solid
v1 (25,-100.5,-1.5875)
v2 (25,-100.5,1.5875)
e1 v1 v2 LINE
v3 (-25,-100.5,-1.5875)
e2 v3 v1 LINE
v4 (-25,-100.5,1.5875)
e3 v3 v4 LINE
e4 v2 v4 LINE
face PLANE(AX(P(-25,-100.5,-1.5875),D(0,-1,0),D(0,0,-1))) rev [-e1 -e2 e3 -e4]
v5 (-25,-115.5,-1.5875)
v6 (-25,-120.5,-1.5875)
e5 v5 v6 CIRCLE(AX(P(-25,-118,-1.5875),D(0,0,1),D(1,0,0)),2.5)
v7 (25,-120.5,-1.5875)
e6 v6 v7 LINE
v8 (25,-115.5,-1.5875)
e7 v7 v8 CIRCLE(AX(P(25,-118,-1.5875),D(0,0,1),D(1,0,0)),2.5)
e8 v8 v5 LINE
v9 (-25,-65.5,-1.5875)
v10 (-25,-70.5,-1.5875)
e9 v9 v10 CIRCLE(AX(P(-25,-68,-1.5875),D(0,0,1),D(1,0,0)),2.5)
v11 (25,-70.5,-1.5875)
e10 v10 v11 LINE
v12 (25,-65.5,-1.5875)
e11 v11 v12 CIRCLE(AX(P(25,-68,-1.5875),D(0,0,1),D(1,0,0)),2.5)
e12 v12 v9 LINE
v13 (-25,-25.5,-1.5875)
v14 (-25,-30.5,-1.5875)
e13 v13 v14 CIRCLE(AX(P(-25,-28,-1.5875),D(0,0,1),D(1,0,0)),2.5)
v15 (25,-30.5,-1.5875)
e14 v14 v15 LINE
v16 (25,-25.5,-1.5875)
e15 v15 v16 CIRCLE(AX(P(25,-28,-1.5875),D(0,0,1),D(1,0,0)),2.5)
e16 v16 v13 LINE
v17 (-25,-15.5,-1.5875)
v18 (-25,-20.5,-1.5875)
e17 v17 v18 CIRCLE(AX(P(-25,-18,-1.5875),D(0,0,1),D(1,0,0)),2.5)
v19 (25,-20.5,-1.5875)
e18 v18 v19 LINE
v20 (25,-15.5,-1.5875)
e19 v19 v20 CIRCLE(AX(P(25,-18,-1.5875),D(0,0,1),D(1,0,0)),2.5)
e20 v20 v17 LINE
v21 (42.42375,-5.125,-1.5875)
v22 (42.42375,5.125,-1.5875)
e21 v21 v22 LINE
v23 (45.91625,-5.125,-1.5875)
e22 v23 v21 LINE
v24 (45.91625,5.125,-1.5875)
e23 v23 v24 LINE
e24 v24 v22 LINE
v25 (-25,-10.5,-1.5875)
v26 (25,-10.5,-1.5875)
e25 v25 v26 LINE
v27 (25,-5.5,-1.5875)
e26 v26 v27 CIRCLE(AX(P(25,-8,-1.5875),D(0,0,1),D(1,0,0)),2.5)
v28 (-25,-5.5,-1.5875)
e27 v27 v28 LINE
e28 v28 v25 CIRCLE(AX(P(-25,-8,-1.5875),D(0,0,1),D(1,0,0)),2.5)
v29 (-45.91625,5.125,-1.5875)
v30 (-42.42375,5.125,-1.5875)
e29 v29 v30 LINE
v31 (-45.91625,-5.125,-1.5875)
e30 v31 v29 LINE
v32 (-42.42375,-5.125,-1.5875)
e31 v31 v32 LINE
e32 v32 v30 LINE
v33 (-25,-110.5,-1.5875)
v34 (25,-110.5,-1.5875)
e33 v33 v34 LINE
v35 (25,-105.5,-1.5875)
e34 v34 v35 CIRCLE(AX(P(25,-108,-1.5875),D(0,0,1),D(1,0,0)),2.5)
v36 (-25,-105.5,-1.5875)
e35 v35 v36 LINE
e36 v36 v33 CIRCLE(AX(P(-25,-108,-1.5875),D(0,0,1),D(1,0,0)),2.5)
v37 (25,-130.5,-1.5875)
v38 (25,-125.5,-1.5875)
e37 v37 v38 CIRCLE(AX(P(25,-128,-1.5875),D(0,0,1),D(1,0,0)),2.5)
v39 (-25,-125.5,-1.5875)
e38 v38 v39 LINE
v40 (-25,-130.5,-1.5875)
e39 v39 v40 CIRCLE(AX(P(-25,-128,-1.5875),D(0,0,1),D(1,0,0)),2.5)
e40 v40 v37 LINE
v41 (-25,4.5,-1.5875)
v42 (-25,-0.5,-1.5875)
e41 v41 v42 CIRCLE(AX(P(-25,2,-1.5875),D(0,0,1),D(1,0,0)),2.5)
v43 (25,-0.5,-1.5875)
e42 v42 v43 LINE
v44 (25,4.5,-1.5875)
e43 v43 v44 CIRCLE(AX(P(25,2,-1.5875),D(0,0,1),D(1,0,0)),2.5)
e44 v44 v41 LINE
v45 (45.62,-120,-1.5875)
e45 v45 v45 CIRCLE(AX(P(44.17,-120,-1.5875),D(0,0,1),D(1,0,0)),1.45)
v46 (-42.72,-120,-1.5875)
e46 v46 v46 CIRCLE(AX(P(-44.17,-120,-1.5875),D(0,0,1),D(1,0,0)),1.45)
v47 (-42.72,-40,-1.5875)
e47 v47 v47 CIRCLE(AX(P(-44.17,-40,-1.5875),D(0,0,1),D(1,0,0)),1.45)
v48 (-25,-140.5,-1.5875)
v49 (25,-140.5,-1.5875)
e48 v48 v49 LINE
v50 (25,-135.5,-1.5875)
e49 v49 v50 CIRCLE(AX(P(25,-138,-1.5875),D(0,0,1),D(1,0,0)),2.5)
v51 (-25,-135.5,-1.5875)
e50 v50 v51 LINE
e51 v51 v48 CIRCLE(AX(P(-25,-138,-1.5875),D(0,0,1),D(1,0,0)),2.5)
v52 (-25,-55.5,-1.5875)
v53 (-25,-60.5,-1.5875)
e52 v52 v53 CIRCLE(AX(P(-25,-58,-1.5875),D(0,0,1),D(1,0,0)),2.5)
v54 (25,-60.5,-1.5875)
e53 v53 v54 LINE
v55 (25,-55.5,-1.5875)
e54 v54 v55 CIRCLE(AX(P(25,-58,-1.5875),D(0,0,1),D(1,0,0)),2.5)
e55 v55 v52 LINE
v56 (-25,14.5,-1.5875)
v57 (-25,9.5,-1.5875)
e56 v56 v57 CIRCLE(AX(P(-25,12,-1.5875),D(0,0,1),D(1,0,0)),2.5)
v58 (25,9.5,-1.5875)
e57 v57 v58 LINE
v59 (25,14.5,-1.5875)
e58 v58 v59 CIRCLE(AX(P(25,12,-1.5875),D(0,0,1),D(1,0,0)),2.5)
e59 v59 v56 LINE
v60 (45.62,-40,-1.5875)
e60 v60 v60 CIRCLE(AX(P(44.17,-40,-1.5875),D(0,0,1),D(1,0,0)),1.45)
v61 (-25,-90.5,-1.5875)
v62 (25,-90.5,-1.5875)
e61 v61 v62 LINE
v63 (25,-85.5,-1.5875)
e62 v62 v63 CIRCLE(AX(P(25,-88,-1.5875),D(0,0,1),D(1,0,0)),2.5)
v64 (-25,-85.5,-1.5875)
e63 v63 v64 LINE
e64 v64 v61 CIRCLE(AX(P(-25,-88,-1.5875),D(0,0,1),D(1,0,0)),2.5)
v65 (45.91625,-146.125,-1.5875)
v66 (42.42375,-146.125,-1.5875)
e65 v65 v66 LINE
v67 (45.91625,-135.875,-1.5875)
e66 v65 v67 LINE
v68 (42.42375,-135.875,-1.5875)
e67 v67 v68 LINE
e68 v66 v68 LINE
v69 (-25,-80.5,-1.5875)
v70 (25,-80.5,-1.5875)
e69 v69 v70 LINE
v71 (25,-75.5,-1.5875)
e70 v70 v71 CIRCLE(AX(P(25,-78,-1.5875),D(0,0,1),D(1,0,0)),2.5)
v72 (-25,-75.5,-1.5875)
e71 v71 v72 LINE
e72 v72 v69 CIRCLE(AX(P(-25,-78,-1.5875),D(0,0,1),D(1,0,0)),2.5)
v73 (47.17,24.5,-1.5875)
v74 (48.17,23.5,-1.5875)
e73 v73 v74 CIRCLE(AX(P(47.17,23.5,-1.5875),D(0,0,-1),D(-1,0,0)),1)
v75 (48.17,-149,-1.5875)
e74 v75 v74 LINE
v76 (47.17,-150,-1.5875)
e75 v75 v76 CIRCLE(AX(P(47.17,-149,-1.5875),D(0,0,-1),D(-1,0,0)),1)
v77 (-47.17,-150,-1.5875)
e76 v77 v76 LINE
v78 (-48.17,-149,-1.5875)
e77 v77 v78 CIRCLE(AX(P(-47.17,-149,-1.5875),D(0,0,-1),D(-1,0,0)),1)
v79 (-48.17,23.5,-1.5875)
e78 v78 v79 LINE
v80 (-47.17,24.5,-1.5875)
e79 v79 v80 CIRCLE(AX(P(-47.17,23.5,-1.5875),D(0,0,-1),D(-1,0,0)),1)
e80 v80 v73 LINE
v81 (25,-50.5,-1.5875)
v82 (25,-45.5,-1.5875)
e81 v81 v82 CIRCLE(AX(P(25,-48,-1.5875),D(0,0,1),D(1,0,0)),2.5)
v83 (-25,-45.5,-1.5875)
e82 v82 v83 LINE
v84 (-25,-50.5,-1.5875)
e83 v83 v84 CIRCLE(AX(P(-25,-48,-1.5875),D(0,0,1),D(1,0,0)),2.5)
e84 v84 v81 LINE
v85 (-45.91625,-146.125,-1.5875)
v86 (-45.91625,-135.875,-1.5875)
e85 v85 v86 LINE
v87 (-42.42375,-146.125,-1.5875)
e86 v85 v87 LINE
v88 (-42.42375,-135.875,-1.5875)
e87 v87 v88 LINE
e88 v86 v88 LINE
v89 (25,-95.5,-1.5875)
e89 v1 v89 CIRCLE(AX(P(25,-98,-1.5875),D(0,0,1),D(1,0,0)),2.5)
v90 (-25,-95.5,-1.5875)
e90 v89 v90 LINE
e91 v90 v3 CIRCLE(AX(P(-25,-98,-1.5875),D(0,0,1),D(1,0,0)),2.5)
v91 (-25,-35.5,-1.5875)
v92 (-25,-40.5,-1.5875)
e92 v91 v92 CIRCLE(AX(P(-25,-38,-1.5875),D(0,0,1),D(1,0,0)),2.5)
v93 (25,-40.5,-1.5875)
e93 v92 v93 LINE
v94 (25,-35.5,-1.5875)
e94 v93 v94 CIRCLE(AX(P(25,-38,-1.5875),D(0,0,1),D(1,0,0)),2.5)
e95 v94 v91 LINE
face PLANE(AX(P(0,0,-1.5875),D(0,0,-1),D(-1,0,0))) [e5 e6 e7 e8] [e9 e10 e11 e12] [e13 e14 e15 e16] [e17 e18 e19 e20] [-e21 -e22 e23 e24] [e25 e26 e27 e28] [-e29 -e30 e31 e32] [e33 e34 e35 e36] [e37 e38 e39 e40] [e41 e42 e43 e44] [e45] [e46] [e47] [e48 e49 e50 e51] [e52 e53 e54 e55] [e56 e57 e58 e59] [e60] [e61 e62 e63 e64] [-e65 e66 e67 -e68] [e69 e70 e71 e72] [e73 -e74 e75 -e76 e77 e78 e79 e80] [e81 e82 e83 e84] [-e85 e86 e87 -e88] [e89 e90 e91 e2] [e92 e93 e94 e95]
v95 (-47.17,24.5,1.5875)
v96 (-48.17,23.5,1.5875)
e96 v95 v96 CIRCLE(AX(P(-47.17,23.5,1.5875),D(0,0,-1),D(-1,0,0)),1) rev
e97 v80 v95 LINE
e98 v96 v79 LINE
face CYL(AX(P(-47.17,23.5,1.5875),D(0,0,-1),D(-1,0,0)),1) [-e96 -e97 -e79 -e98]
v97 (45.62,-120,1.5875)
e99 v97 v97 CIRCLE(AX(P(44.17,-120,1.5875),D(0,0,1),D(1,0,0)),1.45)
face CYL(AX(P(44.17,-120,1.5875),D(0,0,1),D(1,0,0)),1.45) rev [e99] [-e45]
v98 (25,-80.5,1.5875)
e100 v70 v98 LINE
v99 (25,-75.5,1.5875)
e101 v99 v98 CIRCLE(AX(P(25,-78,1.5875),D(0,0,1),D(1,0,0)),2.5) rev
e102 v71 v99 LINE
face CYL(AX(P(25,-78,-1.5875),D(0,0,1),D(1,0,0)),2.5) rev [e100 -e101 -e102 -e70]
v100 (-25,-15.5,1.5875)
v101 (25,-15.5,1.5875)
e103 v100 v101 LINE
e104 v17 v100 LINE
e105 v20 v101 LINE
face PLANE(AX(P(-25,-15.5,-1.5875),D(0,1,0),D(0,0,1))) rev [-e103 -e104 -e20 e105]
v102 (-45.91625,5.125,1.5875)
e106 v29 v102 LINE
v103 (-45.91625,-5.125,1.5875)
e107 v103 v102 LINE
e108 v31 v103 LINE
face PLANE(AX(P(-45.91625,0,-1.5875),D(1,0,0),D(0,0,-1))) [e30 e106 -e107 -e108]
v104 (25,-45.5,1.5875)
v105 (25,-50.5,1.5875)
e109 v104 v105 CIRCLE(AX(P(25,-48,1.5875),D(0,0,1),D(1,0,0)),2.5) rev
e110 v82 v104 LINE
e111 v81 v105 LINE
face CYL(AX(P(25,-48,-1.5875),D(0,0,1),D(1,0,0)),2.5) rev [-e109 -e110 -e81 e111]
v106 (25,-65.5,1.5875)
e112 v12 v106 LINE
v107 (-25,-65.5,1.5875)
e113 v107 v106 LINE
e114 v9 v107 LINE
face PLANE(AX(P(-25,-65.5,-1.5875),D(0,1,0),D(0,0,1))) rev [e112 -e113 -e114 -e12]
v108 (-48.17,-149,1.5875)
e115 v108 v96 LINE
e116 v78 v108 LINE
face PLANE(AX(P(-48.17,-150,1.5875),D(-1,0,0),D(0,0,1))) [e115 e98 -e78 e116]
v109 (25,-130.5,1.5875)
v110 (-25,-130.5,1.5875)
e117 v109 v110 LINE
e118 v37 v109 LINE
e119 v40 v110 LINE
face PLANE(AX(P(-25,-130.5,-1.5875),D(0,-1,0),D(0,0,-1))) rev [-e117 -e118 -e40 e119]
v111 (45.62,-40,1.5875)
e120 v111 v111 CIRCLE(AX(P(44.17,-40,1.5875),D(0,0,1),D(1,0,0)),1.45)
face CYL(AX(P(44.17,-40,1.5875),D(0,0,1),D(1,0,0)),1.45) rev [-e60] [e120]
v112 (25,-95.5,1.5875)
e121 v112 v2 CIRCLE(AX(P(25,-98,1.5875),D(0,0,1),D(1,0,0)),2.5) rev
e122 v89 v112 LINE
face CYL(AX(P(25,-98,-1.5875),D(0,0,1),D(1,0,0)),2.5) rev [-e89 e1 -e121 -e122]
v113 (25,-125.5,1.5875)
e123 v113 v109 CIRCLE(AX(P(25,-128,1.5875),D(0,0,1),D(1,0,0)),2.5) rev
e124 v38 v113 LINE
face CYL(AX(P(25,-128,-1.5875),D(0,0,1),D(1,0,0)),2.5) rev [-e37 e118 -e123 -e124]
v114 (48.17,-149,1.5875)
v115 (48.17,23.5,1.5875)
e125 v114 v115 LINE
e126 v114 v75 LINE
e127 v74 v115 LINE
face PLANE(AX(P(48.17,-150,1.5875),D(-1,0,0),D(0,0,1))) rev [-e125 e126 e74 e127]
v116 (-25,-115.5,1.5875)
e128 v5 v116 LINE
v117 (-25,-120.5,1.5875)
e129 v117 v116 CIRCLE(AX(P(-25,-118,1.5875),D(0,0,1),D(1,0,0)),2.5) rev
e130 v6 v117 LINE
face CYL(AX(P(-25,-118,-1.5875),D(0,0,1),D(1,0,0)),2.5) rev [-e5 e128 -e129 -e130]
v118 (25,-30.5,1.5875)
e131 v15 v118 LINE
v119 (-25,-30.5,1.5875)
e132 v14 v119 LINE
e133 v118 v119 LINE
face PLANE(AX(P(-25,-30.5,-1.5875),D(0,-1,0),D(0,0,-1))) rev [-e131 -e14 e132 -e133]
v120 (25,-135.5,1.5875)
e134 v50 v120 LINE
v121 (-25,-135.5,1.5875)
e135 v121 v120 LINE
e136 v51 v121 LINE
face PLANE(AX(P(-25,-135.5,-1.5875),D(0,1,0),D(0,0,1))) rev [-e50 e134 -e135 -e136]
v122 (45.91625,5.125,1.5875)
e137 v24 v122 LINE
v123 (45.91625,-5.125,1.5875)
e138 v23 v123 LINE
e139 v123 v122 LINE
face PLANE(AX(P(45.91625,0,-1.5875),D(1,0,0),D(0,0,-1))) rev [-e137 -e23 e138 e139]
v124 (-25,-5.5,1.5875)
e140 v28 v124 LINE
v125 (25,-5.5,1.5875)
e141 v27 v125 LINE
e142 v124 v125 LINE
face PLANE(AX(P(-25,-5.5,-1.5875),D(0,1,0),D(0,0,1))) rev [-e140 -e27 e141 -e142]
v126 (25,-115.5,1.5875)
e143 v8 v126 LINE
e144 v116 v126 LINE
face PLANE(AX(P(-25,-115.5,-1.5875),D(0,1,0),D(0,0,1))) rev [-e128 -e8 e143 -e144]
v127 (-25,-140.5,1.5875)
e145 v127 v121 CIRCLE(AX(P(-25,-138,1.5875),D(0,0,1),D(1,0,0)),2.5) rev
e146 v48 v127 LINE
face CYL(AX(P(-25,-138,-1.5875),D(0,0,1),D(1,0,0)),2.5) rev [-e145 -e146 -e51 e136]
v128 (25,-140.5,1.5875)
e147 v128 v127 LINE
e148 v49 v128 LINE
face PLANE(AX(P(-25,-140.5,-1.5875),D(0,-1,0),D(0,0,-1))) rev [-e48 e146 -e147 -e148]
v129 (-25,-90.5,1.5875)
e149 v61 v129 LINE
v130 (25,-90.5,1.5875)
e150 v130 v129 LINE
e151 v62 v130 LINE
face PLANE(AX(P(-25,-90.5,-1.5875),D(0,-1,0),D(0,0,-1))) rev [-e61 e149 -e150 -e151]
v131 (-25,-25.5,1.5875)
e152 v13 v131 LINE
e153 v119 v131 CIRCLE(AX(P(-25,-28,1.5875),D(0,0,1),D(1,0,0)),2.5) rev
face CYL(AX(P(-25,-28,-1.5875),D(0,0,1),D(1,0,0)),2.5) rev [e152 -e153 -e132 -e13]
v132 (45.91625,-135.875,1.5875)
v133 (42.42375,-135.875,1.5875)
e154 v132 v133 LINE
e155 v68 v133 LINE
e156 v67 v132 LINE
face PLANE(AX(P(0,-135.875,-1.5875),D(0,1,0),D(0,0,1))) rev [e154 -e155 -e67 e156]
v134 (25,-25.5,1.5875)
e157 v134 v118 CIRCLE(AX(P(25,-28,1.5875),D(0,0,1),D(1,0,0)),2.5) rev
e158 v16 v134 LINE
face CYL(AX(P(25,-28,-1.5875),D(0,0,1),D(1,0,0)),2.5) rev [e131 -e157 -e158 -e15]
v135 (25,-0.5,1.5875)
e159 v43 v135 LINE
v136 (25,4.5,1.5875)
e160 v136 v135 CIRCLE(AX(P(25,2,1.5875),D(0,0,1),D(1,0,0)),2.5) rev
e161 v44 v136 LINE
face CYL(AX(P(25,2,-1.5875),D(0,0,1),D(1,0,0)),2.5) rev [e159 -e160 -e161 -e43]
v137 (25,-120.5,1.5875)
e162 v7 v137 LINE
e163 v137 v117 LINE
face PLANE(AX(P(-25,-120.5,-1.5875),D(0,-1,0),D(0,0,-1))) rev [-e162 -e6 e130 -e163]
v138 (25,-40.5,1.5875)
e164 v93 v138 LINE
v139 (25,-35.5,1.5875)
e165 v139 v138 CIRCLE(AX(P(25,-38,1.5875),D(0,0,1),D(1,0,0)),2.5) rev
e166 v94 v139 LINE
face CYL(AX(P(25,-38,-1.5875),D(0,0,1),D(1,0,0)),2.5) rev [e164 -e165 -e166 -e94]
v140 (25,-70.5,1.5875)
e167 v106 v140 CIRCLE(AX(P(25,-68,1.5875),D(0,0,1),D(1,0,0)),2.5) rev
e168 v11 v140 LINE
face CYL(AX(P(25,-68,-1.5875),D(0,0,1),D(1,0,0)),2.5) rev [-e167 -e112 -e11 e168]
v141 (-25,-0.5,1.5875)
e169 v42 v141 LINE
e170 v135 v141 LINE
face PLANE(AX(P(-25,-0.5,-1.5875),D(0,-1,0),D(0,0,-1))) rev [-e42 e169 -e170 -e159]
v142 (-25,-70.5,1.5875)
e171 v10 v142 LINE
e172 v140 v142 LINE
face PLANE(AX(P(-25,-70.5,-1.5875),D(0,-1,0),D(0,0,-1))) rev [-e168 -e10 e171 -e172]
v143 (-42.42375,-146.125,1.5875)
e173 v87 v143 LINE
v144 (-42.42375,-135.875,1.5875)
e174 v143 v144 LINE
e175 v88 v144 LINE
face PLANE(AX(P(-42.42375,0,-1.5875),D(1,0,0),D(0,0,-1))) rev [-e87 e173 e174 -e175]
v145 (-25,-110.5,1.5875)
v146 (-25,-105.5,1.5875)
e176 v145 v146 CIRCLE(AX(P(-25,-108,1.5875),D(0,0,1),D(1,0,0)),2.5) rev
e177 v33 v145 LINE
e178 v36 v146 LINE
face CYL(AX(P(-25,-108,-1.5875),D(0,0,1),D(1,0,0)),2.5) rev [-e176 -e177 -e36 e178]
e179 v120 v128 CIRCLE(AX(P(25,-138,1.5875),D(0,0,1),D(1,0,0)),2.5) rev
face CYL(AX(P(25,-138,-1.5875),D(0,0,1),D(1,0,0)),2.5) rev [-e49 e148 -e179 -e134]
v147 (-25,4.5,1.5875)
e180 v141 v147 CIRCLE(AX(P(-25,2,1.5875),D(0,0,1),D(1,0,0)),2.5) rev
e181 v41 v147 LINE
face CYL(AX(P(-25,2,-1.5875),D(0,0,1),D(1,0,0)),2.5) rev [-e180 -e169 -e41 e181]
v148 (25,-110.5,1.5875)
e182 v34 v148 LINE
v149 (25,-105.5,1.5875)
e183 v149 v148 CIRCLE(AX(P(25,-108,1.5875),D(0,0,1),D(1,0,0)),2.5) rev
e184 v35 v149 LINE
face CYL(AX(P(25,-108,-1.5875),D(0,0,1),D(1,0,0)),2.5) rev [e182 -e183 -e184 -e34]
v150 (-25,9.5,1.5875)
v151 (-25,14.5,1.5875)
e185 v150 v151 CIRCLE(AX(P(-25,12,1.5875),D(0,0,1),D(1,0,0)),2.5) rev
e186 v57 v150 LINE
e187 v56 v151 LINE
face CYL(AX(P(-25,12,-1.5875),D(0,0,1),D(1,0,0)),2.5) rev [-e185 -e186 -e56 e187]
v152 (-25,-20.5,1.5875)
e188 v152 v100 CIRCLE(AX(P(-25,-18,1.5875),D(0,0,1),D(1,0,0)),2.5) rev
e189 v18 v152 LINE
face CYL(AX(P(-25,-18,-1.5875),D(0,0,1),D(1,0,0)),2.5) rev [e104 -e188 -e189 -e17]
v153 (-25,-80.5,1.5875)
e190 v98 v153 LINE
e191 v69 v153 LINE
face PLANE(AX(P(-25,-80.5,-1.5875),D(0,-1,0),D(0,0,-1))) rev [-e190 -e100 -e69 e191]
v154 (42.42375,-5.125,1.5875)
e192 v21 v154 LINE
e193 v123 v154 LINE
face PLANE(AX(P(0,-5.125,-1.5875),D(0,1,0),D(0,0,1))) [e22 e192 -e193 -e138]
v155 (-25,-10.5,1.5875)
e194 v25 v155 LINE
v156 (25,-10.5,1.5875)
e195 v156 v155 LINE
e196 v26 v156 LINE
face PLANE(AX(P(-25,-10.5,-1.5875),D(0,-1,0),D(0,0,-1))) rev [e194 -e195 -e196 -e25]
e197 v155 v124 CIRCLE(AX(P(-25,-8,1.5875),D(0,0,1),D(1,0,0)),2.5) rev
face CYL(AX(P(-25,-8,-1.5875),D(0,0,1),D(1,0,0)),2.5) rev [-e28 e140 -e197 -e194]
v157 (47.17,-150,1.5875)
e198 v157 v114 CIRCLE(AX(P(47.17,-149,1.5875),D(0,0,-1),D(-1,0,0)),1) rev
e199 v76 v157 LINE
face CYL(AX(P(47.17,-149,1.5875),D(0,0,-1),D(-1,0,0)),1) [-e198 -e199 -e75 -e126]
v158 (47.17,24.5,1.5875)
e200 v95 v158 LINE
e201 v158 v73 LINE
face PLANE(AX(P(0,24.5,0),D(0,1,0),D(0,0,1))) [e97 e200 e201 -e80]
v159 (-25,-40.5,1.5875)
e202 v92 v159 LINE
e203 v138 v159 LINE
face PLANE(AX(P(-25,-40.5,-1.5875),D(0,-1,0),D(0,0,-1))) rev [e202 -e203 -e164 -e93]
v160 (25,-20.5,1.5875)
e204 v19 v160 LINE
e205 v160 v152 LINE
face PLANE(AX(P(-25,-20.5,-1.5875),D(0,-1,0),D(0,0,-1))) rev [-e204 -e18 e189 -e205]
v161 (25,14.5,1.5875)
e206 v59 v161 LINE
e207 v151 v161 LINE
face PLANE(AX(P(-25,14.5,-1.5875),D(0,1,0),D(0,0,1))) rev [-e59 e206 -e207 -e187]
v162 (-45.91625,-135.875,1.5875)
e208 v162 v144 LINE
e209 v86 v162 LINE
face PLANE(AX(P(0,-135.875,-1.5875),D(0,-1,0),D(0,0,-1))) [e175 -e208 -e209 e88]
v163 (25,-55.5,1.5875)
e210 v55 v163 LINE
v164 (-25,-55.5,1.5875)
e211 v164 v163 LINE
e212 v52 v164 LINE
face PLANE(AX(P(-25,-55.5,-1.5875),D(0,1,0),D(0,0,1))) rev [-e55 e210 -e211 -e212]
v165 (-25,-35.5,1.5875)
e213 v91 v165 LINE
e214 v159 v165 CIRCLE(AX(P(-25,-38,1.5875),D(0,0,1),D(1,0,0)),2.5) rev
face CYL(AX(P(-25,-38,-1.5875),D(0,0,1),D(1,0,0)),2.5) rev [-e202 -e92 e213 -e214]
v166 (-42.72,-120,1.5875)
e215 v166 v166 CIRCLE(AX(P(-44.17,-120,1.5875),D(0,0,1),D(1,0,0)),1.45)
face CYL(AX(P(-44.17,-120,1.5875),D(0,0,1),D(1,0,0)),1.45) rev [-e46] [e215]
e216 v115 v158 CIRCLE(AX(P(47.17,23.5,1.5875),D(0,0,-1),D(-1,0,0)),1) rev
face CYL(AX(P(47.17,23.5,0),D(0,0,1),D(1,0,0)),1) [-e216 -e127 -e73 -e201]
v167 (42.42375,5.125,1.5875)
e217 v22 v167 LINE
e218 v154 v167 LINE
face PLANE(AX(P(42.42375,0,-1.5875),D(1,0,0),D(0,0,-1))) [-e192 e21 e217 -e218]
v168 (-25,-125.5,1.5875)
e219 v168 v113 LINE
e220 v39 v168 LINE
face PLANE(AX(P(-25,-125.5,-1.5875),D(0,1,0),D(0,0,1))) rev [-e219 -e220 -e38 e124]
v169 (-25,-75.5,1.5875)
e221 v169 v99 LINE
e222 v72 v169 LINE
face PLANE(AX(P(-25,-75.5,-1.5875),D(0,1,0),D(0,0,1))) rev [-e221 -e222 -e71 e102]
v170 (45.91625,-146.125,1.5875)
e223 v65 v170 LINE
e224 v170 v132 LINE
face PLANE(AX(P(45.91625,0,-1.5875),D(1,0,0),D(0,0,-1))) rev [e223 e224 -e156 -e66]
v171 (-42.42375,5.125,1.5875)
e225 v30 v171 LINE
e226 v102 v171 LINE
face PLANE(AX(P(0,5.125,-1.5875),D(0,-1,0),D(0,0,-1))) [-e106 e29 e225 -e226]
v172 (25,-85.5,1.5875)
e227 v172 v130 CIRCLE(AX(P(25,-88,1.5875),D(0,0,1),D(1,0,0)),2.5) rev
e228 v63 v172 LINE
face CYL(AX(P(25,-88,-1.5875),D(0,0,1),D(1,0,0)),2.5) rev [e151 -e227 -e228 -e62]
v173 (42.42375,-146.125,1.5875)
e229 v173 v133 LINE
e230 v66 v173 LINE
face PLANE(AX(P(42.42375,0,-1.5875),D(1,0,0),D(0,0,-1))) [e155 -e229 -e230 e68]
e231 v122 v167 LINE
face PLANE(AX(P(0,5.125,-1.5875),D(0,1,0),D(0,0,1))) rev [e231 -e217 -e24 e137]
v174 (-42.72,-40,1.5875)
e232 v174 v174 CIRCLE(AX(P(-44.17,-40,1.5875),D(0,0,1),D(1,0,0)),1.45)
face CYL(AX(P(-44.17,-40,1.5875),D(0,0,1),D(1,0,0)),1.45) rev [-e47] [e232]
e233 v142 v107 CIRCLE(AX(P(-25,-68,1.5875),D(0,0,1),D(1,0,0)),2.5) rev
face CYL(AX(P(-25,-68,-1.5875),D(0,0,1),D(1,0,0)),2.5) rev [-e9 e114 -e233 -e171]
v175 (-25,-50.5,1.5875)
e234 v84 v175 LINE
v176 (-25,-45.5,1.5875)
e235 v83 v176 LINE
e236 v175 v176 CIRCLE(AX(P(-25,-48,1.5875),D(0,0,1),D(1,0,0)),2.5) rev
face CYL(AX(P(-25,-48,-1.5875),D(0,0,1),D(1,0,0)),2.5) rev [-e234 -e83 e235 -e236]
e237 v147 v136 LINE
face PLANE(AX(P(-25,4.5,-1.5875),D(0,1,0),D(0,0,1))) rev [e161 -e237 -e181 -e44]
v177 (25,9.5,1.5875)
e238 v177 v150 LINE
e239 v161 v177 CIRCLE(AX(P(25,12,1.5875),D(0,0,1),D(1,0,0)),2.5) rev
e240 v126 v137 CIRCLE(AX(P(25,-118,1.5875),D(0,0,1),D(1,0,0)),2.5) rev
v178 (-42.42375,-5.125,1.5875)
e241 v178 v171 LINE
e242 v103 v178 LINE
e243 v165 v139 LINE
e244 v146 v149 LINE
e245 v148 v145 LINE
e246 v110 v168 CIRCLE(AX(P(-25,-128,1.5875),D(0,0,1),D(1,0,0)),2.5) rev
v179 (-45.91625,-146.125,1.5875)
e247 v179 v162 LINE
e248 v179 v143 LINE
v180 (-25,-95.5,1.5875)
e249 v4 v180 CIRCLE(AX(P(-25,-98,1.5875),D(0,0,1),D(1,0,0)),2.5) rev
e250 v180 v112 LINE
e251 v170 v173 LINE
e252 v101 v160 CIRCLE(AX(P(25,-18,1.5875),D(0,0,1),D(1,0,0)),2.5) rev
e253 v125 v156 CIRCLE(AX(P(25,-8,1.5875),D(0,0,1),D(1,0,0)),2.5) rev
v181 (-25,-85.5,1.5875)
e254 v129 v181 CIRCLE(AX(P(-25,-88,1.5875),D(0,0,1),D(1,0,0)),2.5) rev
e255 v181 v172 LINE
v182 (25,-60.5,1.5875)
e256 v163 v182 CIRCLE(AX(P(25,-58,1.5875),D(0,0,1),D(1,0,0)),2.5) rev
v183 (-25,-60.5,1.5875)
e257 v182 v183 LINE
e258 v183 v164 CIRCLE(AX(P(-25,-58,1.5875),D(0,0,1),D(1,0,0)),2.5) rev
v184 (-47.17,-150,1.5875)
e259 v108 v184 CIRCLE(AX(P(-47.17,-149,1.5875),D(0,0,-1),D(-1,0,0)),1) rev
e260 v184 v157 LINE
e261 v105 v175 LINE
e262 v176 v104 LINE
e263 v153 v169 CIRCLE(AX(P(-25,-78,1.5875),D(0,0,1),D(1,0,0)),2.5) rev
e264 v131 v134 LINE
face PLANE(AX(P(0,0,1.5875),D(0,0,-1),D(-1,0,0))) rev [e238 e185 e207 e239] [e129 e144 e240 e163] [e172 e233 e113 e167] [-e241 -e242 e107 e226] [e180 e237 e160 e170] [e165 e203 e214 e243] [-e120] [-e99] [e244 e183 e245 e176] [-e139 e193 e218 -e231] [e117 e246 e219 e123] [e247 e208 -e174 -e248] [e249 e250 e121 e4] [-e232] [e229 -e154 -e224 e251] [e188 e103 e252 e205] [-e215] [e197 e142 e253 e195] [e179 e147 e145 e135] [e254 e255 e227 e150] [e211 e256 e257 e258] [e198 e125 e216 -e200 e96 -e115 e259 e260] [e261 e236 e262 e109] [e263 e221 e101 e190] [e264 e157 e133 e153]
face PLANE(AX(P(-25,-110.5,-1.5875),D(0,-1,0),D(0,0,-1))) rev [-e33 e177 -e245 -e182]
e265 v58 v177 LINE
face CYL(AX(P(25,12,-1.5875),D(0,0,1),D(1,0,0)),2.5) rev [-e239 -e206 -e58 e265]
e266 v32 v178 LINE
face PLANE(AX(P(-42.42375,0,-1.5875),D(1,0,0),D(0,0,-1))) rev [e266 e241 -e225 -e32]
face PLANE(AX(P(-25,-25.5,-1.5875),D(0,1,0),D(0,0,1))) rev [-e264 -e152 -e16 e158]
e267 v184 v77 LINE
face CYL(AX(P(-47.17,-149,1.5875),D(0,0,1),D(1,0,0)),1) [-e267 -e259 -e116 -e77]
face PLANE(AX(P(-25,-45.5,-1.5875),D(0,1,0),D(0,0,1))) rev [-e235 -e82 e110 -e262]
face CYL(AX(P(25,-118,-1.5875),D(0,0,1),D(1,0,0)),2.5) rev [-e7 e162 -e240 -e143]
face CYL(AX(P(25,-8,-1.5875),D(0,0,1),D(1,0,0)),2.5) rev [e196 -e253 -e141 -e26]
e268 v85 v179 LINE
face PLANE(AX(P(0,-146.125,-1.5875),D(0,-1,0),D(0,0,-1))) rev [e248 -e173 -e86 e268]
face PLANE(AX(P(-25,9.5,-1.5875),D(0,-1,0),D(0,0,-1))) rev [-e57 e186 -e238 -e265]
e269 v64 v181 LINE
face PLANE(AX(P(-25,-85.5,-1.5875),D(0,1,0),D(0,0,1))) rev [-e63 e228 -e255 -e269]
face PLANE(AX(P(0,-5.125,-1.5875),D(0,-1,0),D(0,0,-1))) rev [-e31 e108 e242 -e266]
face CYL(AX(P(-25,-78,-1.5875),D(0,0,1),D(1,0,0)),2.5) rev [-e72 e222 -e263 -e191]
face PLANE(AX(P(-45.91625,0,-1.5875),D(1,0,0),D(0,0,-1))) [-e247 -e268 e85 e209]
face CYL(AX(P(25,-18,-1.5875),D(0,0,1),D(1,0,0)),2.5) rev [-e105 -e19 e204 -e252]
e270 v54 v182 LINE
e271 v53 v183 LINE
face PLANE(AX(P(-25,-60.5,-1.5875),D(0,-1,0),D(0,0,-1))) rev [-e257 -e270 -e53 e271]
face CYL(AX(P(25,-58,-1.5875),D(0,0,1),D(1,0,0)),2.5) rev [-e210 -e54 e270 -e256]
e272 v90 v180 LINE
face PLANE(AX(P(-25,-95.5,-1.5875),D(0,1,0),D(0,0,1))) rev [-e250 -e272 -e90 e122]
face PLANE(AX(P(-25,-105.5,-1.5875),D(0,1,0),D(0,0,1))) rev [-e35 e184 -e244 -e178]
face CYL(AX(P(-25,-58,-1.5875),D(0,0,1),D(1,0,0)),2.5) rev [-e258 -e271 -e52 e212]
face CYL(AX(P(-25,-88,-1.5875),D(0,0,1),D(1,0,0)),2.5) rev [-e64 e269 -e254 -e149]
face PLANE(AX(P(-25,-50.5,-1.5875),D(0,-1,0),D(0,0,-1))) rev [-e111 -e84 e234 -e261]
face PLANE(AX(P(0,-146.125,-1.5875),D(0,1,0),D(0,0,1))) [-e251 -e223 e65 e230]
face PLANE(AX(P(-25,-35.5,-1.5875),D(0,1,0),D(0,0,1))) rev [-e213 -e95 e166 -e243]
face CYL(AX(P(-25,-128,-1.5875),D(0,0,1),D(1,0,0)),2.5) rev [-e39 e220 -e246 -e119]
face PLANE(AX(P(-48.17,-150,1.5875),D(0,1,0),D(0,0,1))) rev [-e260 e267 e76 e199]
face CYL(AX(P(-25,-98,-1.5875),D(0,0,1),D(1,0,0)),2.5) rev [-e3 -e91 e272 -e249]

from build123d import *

# Parameters (mm, degrees)
STOCK_TORSO_FRONT_PLATE_1_START       = -1.5875
STOCK_TORSO_FRONT_PLATE_1_OUTLINE_W   = 96.34
STOCK_TORSO_FRONT_PLATE_1_OUTLINE_H   = 174.5
STOCK_TORSO_FRONT_PLATE_1_OUTLINE_W_2 = 3.4925
STOCK_TORSO_FRONT_PLATE_1_OUTLINE_H_2 = 10.25
STOCK_TORSO_FRONT_PLATE_1_OUTLINE_R   = 1.45
STOCK_TORSO_FRONT_PLATE_1_DEPTH       = 3.175
CUT_EXTRUDE1_DEPTH                    = 158.576741701
LPATTERN1_COUNT                       = 16
LPATTERN1_PITCH                       = 10
FILLET1_R                             = 1


# Read off the part's stored shape, not the designer's step: Stock-torso_front_plate-1
with BuildPart() as part:
    # Stock-torso_front_plate-1 outline → Stock-torso_front_plate-1 (new body)
    with BuildSketch(Plane.XY.offset(STOCK_TORSO_FRONT_PLATE_1_START)):
        with Locations((0, -62.75)):
            Rectangle(STOCK_TORSO_FRONT_PLATE_1_OUTLINE_W, STOCK_TORSO_FRONT_PLATE_1_OUTLINE_H)
        with Locations((-44.17, -141)):
            Rectangle(STOCK_TORSO_FRONT_PLATE_1_OUTLINE_W_2, STOCK_TORSO_FRONT_PLATE_1_OUTLINE_H_2, mode=Mode.SUBTRACT)
        with Locations((-44.17, -120)):
            Circle(STOCK_TORSO_FRONT_PLATE_1_OUTLINE_R, mode=Mode.SUBTRACT)
        with Locations((44.17, -141)):
            Rectangle(STOCK_TORSO_FRONT_PLATE_1_OUTLINE_W_2, STOCK_TORSO_FRONT_PLATE_1_OUTLINE_H_2, mode=Mode.SUBTRACT)
        with Locations((44.17, -120)):
            Circle(STOCK_TORSO_FRONT_PLATE_1_OUTLINE_R, mode=Mode.SUBTRACT)
        with Locations((-44.17, -40)):
            Circle(STOCK_TORSO_FRONT_PLATE_1_OUTLINE_R, mode=Mode.SUBTRACT)
        with Locations((-44.17, 0)):
            Rectangle(STOCK_TORSO_FRONT_PLATE_1_OUTLINE_W_2, STOCK_TORSO_FRONT_PLATE_1_OUTLINE_H_2, mode=Mode.SUBTRACT)
        with Locations((44.17, -40)):
            Circle(STOCK_TORSO_FRONT_PLATE_1_OUTLINE_R, mode=Mode.SUBTRACT)
        with Locations((44.17, 0)):
            Rectangle(STOCK_TORSO_FRONT_PLATE_1_OUTLINE_W_2, STOCK_TORSO_FRONT_PLATE_1_OUTLINE_H_2, mode=Mode.SUBTRACT)
    extrude(amount=STOCK_TORSO_FRONT_PLATE_1_DEPTH)

    # Sketch1 → Cut-Extrude1 (cut, symmetric)
    with BuildSketch(Plane.XY.offset(1.5875)):
        with BuildLine():
            Line((-25, 14.5), (25, 14.5))
            ThreePointArc((25, 14.5), (27.5, 12), (25, 9.5))
            Line((25, 9.5), (-25, 9.5))
            ThreePointArc((-25, 9.5), (-27.5, 12), (-25, 14.5))
        make_face()
    cut_extrude1 = extrude(amount=CUT_EXTRUDE1_DEPTH, both=True, mode=Mode.SUBTRACT)

    # LPattern1: Cut-Extrude1 ×16
    with Locations(*[(0, -i * LPATTERN1_PITCH, 0) for i in range(1, LPATTERN1_COUNT)]):
        add(cut_extrude1, mode=Mode.SUBTRACT)

    # Fillet1
    fillet1_edges = [part.edges().sort_by_distance(p)[0] for p in [
        (48.17, -150, 0),
        (-48.17, -150, 0),
        (-48.17, 24.5, 0),
        (48.17, 24.5, 0),
    ]]
    fillet(fillet1_edges, radius=FILLET1_R)


solid = part.part
